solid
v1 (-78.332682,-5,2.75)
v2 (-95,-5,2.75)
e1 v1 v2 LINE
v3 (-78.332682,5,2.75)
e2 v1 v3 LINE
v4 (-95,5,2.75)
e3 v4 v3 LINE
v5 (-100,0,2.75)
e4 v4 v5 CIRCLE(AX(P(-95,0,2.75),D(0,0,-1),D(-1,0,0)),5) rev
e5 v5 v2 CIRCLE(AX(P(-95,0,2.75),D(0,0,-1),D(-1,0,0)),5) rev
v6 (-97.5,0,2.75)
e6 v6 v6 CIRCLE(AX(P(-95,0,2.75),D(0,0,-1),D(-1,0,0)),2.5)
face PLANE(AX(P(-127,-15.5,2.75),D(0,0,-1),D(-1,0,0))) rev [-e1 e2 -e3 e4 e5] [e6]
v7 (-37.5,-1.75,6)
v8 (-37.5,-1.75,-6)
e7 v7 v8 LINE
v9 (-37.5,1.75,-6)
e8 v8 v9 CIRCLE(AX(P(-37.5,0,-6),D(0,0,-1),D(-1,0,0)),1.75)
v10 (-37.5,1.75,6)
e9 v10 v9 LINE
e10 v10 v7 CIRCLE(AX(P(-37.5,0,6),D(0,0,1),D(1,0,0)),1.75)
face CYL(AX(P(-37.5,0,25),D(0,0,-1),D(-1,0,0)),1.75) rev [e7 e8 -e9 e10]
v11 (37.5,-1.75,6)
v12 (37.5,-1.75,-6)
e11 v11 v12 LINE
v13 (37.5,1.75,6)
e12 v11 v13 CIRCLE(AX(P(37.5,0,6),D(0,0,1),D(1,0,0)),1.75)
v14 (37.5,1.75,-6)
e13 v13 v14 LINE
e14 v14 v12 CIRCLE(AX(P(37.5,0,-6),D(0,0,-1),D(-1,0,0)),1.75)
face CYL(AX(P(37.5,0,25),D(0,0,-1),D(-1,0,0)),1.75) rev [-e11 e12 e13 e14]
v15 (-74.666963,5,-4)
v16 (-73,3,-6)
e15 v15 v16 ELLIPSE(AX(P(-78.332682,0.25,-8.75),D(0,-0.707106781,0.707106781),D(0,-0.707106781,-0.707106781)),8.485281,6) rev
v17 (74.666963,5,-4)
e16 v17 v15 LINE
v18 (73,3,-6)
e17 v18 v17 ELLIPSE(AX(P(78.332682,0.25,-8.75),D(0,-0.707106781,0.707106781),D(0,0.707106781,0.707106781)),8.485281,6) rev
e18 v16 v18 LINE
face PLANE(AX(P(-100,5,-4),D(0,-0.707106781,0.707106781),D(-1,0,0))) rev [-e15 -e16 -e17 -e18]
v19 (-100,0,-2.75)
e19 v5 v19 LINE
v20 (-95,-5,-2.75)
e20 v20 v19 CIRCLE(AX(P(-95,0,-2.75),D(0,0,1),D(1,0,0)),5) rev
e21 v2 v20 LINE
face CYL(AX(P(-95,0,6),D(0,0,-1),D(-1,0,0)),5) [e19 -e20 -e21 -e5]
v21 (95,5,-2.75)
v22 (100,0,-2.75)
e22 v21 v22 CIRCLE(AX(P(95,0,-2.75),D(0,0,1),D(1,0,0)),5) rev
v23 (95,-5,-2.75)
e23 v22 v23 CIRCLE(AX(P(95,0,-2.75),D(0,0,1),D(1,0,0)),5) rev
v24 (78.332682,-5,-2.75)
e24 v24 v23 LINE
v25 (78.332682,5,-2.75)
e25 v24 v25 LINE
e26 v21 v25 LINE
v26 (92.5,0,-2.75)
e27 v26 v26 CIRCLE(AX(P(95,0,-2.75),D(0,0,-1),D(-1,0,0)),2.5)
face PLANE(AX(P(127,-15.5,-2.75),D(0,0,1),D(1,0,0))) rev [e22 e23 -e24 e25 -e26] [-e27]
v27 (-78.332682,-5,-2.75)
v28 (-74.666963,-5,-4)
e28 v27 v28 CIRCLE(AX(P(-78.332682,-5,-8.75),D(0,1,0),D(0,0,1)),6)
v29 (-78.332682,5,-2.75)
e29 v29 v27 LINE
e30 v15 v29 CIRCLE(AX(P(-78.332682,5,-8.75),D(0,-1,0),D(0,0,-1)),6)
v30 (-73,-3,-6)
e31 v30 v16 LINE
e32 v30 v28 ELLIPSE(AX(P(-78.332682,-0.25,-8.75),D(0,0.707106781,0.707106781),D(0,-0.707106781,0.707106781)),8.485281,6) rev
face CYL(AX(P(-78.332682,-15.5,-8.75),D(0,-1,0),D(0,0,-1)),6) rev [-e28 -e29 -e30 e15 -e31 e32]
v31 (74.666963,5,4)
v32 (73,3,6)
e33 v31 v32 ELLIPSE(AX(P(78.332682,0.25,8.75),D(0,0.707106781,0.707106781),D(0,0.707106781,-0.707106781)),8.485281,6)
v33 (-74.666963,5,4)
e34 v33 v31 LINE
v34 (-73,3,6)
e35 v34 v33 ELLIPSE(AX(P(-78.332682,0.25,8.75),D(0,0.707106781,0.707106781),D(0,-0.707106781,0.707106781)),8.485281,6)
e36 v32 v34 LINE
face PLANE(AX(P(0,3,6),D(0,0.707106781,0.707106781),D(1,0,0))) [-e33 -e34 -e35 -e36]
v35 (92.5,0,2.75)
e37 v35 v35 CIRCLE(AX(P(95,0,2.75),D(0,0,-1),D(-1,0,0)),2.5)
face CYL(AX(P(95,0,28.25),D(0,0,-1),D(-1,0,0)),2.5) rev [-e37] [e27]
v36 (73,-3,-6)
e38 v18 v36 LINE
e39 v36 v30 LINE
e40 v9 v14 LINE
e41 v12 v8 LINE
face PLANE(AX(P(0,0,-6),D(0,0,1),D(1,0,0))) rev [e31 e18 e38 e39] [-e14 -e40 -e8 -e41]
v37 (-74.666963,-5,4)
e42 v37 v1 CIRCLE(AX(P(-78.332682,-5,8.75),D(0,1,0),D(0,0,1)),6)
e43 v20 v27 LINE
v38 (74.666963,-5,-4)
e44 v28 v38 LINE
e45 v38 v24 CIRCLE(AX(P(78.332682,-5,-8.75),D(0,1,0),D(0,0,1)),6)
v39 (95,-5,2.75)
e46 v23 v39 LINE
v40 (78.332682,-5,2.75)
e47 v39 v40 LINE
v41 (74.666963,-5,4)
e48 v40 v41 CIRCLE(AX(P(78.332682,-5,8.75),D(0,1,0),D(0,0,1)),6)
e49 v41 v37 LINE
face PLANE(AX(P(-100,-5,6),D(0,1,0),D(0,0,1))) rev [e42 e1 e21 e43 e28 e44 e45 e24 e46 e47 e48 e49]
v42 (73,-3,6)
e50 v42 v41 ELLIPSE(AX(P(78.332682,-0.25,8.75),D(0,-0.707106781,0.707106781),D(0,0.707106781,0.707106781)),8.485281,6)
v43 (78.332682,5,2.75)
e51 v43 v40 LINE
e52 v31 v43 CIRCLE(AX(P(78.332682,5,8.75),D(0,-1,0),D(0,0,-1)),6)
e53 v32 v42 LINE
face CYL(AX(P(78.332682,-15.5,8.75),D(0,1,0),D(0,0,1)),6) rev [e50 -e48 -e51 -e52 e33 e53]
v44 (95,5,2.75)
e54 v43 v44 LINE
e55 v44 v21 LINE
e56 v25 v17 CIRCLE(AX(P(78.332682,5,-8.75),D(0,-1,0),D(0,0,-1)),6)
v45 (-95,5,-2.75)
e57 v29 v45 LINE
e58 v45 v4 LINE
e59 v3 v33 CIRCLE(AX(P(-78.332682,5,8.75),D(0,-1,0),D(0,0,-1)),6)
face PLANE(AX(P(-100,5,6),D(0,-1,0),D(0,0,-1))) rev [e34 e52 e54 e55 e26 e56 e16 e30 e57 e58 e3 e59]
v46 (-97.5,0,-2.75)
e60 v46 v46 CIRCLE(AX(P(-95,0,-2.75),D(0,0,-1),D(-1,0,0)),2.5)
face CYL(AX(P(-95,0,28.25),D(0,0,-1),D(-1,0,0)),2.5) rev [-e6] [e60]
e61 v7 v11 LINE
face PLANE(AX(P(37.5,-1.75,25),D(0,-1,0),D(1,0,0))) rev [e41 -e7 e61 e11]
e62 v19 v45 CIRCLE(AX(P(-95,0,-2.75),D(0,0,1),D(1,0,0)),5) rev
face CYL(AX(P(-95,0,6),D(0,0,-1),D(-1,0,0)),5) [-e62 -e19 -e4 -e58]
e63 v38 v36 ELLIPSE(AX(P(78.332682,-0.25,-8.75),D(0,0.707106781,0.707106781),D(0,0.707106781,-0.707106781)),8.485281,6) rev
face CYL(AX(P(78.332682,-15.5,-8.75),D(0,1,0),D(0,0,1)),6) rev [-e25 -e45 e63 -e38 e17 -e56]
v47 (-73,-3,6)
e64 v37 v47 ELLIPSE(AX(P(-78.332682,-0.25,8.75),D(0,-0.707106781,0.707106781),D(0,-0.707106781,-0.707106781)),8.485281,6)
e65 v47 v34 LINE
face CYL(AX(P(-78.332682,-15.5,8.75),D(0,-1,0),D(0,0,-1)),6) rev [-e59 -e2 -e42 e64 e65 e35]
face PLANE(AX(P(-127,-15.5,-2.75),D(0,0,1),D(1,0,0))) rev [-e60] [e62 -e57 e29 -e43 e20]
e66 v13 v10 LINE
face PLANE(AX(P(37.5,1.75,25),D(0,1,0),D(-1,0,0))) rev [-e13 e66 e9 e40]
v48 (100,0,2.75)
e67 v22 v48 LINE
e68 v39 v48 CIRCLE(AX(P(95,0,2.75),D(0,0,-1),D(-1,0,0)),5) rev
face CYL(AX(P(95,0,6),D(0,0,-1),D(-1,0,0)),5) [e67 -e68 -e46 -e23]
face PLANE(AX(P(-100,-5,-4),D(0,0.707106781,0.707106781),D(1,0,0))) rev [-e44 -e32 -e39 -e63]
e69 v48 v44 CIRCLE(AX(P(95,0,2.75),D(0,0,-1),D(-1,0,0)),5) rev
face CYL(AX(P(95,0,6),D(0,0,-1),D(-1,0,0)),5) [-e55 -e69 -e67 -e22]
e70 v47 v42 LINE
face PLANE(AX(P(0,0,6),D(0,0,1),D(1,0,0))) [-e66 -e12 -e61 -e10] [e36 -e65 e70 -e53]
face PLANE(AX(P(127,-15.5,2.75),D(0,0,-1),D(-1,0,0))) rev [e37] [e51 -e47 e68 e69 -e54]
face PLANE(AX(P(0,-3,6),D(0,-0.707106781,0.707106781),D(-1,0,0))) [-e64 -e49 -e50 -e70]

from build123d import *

# Parameters (mm, degrees)
SKETCH1_W           = 200
SKETCH1_H           = 10
BOSS_EXTRUDE1_DEPTH = 6
SKETCH2_W           = 54
SKETCH2_H           = 6.5
CUT_EXTRUDE1_DEPTH  = 15.5
FILLET1_R           = 6
FILLET2_R           = 5
CHAMFER1_SIZE       = 2
CUT_EXTRUDE2_DEPTH  = 31
SKETCH4_R           = 2.5
CUT_EXTRUDE3_DEPTH  = 31


# Some blends are built 0.0001 mm under size
with BuildPart() as part:
    # Sketch1 → Boss-Extrude1 (new, symmetric)
    with BuildSketch(Plane.XY):
        Rectangle(SKETCH1_W, SKETCH1_H)
    extrude(amount=BOSS_EXTRUDE1_DEPTH, both=True)

    # Sketch2 → Cut-Extrude1 (cut, symmetric)
    with BuildSketch(Plane(origin=(0, 0, 0), x_dir=(1, 0, 0), z_dir=(0, 1, 0))):
        with Locations((100, 6)):
            Rectangle(SKETCH2_W, SKETCH2_H)
        with Locations((100, -6)):
            Rectangle(SKETCH2_W, SKETCH2_H)
        with Locations((-100, -6)):
            Rectangle(SKETCH2_W, SKETCH2_H)
        with Locations((-100, 6)):
            Rectangle(SKETCH2_W, SKETCH2_H)
    extrude(amount=CUT_EXTRUDE1_DEPTH, both=True, mode=Mode.SUBTRACT)

    # Fillet1
    # the kernel refuses this fillet: 6 mm, written as the material it adds along each edge
    with BuildSketch(Plane(origin=(73, -5, -2.75), x_dir=(1, 0, 0), z_dir=(0, 1, 0)), Plane(origin=(-73, -5, 2.75), x_dir=(-1, 0, 0), z_dir=(0, 1, 0))) as fillet1_piece_1:
        with BuildLine():
            CenterArc((5.332682252, 6), FILLET1_R, 207.279612736, 62.720387264)
            Line((0, 3.25), (-0.106653645, 3.195))
            ThreePointArc((-0.106653645, 3.195), (-0.12, 1.625), (-0.12, 0))
            Line((-0.12, 0), (0, -0.12))
            Line((0, -0.12), (5.332682252, -0.12))
            Line((5.332682252, -0.12), (5.332682252, 0))
        make_face()
    extrude(amount=10)
    with BuildSketch(Plane(origin=(73, 5, 2.75), x_dir=(0, 0, 1), z_dir=(0, -1, 0)), Plane(origin=(-73, 5, -2.75), x_dir=(0, 0, -1), z_dir=(0, -1, 0))) as fillet1_piece_2:
        with BuildLine():
            CenterArc((6, -5.332682252), FILLET1_R, 117.279612736, 62.720387264)
            Line((0, -5.332682252), (-0.12, -5.332682252))
            Line((-0.12, -5.332682252), (-0.12, 0))
            Line((-0.12, 0), (0, 0.12))
            ThreePointArc((0, 0.12), (1.625, 0.12), (3.195, 0.106653645))
            Line((3.195, 0.106653645), (3.25, 0))
        make_face()
    extrude(amount=10)

    # Fillet2
    fillet2_edges = [part.edges().sort_by_distance(p)[0] for p in [
        (-100, -5, 0),
        (-100, 5, 0),
        (100, -5, 0),
        (100, 5, 0),
    ]]
    fillet(fillet2_edges, radius=FILLET2_R - 0.0001)  # a hair under: the kernel refuses the full size

    # Chamfer1
    chamfer1_edges = [part.edges().sort_by_distance(p)[0] for p in [
        (0, -5, -6),
        (0, 5, -6),
        (0, 5, 6),
        (0, -5, 6),
    ]]
    chamfer(chamfer1_edges, length=CHAMFER1_SIZE)

    # Sketch3 → Cut-Extrude2 (cut)
    with BuildSketch(Plane(origin=(0, 0, -6), x_dir=(-1, 0, 0), z_dir=(0, 0, -1))):
        with BuildLine():
            Line((-37.5, 1.75), (37.5, 1.75))
            ThreePointArc((37.5, 1.75), (39.25, 0), (37.5, -1.75))
            Line((37.5, -1.75), (-37.5, -1.75))
            ThreePointArc((-37.5, -1.75), (-39.25, 0), (-37.5, 1.75))
        make_face()
    extrude(amount=-CUT_EXTRUDE2_DEPTH, mode=Mode.SUBTRACT)

    # Sketch4 → Cut-Extrude3 (cut)
    with BuildSketch(Plane(origin=(0, 0, -2.75), x_dir=(-1, 0, 0), z_dir=(0, 0, -1))):
        with Locations((95, 0)):
            Circle(SKETCH4_R)
        with Locations((-95, 0)):
            Circle(SKETCH4_R)
    extrude(amount=-CUT_EXTRUDE3_DEPTH, mode=Mode.SUBTRACT)


solid = part.part
